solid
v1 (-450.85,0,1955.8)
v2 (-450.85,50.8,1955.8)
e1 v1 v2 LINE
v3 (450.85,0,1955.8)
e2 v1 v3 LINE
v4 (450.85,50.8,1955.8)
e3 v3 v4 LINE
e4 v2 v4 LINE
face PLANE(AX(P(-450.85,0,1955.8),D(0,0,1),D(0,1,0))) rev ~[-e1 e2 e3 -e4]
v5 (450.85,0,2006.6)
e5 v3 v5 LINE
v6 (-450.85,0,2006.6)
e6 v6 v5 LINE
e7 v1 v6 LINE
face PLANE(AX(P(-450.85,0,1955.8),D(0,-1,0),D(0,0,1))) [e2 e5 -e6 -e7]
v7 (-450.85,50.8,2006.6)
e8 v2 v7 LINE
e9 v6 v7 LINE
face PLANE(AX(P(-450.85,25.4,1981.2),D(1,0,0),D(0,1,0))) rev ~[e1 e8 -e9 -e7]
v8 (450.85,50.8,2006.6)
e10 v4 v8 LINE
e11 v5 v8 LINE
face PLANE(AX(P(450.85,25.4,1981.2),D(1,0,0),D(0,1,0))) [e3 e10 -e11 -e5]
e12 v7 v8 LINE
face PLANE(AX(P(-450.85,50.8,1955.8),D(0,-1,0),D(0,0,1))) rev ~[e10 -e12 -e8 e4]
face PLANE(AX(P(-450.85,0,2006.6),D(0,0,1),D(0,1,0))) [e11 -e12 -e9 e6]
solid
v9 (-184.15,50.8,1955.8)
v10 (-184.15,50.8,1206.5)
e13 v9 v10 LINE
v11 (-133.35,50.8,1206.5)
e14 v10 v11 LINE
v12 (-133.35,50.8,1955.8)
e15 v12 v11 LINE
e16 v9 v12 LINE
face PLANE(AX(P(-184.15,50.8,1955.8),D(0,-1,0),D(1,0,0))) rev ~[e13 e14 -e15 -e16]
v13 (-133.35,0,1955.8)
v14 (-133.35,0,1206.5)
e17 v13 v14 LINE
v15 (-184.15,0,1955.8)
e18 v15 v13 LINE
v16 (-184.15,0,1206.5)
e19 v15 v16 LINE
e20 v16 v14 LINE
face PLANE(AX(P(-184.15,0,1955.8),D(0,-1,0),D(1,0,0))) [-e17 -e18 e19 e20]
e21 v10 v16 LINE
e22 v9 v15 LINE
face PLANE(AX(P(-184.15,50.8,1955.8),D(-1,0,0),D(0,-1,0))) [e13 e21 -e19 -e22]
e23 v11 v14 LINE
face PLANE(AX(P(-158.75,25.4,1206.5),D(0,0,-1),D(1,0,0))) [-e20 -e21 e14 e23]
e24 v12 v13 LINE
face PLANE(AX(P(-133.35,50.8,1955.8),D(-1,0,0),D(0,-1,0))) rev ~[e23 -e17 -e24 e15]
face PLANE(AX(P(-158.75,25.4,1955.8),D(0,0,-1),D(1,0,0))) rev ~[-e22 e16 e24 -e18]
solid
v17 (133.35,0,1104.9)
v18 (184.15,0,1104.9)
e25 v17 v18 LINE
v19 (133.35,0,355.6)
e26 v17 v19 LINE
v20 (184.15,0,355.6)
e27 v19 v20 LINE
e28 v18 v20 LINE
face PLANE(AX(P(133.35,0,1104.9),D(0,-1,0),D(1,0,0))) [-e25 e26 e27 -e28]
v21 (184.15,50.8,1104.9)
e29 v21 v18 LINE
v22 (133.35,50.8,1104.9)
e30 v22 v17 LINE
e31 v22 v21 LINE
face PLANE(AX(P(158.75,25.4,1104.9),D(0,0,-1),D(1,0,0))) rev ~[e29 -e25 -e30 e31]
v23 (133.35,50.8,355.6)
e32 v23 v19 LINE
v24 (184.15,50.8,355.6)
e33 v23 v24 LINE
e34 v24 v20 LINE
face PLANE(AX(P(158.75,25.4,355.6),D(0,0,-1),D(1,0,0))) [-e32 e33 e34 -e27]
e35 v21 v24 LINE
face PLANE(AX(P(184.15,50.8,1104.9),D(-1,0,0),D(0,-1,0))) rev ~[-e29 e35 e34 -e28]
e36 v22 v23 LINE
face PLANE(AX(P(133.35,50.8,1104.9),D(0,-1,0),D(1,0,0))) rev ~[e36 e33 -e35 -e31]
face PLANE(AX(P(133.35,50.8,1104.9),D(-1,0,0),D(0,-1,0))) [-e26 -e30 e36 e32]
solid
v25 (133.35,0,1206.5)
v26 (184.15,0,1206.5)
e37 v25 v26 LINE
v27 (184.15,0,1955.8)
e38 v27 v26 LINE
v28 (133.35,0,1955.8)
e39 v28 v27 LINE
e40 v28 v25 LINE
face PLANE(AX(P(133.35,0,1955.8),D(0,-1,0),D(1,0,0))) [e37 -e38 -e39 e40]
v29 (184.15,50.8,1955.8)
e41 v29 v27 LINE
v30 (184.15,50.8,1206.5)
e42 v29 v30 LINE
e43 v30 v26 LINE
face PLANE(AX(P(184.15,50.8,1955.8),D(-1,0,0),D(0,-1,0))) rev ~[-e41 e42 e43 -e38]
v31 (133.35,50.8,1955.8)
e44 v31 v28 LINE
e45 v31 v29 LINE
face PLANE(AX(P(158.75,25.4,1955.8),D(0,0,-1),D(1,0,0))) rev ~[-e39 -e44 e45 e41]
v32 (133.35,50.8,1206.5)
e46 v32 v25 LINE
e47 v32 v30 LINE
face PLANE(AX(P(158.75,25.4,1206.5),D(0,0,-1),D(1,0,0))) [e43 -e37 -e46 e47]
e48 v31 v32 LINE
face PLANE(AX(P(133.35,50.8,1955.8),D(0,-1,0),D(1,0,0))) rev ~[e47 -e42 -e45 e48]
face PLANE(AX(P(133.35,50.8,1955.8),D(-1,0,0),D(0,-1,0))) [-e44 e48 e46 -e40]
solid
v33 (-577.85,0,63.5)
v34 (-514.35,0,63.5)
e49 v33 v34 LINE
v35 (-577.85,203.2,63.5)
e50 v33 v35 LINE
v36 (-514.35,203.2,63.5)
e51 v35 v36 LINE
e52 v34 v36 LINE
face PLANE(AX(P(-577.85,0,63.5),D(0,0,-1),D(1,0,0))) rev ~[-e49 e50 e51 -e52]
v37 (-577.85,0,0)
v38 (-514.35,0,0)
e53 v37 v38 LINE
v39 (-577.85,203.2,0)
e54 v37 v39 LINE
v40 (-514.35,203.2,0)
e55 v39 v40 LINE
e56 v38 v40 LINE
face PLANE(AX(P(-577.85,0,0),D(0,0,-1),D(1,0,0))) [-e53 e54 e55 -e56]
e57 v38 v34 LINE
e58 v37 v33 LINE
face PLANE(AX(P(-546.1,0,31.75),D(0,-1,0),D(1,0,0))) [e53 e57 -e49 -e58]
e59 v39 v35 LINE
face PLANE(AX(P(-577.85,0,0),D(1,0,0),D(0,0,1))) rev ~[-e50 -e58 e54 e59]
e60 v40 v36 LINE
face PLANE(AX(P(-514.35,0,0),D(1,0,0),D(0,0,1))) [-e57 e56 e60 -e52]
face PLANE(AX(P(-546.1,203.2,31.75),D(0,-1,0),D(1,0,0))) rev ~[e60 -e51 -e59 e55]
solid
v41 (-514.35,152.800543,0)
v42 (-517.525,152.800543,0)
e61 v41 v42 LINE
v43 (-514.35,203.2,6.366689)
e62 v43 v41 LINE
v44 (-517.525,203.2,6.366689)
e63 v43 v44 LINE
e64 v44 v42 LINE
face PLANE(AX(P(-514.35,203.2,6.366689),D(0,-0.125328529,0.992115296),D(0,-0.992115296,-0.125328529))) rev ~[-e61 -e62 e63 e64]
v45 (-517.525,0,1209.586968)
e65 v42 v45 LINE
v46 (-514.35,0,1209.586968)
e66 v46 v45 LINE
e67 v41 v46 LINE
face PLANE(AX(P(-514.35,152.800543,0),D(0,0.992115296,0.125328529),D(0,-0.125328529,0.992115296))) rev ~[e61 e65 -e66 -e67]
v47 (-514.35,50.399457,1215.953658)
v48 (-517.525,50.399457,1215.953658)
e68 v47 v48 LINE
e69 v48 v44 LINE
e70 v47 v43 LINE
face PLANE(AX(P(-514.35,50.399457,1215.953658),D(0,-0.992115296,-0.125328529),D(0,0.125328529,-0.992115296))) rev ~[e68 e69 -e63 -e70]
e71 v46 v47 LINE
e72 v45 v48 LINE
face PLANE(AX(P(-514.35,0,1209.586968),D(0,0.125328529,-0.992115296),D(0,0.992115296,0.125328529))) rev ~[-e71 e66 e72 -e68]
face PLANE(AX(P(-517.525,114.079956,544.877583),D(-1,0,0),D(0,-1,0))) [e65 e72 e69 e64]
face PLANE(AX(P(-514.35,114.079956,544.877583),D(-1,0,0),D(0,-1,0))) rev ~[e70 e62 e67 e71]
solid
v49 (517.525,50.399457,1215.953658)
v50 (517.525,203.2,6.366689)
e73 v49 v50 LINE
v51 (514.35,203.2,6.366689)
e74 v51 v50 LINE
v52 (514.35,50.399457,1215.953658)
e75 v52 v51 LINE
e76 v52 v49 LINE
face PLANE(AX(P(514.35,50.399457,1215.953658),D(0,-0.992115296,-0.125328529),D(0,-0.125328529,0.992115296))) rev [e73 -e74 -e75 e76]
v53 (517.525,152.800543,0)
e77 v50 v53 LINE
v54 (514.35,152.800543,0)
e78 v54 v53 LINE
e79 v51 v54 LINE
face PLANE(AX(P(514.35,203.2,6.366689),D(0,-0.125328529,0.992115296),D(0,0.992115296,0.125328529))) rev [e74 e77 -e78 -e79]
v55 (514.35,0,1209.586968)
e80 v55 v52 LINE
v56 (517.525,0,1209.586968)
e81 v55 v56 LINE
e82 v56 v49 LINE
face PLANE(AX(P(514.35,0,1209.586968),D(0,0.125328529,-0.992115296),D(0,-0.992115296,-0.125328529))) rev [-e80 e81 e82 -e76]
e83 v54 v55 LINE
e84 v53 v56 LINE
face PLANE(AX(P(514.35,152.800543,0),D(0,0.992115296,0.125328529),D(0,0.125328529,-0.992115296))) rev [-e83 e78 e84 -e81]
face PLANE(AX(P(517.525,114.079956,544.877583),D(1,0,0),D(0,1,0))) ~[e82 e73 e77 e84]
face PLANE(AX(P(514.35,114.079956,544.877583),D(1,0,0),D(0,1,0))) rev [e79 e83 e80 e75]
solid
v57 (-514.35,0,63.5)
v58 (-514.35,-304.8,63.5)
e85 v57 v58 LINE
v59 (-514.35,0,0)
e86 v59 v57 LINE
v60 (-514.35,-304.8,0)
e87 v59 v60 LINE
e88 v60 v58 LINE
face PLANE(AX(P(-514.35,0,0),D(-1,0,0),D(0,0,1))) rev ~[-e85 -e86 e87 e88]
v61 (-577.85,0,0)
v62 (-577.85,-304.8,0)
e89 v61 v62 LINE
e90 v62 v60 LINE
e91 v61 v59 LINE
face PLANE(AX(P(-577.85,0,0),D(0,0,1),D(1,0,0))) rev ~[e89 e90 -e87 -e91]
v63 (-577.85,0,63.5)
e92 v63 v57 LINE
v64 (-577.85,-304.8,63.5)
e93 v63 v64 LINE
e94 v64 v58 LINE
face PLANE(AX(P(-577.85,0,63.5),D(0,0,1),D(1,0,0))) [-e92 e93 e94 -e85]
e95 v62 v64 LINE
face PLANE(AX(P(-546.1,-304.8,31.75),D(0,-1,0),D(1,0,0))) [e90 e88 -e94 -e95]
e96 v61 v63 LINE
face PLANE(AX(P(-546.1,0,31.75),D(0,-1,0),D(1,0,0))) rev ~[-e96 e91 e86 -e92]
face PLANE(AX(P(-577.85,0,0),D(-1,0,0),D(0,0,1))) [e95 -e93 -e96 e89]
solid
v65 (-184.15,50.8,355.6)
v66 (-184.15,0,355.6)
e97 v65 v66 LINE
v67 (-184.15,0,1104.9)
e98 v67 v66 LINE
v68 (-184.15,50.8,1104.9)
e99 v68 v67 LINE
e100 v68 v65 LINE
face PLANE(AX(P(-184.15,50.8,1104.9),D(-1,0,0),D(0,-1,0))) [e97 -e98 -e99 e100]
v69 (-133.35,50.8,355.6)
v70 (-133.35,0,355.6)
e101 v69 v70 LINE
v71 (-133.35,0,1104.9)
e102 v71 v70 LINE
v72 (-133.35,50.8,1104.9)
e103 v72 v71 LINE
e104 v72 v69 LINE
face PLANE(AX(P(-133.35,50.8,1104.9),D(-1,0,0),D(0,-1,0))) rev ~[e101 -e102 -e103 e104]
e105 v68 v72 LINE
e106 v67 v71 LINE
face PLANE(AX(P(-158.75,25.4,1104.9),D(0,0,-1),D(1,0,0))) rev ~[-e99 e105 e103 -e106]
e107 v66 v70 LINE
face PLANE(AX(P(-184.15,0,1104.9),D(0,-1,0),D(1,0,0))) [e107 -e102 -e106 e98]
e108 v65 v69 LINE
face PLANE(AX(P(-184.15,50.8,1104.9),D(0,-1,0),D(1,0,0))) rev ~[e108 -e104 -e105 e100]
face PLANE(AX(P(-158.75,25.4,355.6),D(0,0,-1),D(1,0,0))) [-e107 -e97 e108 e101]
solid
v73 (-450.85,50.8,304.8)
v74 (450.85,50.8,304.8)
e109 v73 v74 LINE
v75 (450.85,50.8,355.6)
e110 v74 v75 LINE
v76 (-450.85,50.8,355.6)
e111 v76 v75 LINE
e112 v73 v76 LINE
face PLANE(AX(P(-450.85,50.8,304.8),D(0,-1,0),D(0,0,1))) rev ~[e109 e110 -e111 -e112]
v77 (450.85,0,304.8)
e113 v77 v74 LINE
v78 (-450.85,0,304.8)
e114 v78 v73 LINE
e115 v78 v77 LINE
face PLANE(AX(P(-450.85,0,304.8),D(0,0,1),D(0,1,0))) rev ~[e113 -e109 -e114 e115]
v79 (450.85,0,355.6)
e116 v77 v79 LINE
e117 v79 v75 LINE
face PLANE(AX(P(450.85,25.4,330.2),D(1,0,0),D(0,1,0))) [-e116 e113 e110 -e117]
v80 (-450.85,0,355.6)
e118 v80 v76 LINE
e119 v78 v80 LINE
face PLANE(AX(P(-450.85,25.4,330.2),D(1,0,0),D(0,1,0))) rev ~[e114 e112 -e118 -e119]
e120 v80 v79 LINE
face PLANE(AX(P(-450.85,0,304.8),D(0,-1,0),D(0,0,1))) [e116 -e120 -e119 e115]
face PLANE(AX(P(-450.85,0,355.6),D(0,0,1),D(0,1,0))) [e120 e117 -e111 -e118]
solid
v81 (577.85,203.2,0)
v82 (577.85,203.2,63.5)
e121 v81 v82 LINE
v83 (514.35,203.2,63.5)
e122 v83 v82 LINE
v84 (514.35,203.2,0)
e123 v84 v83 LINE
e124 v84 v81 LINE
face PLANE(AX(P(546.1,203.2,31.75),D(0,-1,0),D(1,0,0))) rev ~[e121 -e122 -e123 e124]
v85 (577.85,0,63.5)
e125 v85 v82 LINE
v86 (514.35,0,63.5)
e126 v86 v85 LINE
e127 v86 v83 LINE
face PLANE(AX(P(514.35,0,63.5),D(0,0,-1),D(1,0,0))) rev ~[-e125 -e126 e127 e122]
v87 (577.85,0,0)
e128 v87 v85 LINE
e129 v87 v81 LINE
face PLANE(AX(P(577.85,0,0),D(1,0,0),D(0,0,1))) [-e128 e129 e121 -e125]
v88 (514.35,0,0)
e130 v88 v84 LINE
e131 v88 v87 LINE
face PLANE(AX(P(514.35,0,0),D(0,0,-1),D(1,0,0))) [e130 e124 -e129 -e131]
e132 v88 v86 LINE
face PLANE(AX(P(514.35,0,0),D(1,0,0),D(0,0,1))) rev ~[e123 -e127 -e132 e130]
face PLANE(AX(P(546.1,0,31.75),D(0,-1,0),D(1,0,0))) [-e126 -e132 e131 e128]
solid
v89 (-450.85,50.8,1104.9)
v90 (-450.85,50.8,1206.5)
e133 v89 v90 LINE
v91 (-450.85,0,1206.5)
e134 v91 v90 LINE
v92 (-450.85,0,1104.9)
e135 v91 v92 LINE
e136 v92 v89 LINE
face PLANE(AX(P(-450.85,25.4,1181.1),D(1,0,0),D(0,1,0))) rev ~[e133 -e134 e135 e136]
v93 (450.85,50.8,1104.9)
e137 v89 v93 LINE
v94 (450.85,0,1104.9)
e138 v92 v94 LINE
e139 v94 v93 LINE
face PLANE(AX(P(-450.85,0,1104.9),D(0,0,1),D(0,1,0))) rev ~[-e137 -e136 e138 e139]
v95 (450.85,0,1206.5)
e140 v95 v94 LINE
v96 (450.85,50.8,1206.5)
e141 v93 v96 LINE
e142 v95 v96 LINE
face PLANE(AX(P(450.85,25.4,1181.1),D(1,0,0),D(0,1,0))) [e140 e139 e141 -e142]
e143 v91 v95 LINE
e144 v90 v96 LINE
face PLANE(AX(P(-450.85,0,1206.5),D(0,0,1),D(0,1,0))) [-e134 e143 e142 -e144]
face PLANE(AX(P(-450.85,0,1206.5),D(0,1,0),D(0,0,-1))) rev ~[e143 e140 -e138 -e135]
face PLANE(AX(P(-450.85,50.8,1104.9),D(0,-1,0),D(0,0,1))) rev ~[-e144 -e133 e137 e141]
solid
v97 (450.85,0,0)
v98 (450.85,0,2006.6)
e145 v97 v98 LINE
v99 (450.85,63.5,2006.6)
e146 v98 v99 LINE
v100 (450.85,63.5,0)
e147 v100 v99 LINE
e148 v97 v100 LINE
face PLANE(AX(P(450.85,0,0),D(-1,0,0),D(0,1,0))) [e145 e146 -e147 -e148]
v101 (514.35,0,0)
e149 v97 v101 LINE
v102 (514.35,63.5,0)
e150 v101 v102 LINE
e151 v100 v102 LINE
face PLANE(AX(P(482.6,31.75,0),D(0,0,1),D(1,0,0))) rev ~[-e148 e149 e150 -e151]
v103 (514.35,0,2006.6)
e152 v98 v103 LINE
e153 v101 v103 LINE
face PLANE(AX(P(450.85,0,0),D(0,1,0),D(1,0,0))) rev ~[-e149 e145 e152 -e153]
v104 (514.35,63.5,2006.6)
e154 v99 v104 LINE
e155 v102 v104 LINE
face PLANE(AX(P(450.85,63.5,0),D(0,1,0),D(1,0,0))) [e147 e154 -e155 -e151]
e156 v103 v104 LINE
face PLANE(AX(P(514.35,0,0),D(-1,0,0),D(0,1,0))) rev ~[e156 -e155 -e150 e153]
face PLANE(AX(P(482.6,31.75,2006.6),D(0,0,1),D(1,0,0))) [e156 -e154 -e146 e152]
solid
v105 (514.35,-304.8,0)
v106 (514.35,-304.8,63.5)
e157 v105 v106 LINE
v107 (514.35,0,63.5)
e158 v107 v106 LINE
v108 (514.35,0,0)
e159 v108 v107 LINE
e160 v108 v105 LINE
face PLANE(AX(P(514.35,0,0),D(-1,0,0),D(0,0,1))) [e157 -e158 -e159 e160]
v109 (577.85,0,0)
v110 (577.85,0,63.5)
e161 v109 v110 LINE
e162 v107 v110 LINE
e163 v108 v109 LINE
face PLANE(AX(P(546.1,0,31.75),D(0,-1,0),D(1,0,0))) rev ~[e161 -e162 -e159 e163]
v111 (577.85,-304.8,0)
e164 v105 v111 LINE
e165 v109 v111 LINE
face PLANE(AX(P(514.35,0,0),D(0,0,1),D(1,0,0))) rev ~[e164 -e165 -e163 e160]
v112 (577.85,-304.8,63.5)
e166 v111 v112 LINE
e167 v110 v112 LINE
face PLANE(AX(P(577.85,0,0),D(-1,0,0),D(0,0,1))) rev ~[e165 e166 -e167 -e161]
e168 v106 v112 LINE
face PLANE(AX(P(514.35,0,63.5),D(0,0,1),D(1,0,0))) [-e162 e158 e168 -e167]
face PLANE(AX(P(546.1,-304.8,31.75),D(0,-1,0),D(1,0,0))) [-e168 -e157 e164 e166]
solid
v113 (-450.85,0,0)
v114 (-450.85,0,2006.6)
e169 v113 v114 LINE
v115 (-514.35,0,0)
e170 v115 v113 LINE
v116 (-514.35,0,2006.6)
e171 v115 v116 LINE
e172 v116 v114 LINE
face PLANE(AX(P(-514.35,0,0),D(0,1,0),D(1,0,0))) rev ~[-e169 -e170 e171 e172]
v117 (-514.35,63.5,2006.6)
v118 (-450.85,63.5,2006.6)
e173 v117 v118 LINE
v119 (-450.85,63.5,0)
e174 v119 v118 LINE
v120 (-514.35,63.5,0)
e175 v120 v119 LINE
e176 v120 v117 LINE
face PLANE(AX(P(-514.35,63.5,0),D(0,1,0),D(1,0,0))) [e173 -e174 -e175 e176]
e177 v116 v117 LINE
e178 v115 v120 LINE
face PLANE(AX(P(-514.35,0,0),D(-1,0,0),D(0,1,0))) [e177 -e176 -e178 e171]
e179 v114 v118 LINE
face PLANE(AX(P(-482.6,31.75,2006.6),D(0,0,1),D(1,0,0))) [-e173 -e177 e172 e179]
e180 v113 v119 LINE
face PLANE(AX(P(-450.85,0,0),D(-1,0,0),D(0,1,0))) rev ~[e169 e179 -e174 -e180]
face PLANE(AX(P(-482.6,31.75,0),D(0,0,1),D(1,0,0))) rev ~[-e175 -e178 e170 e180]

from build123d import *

# Parameters (mm, degrees)
F0_W      = 63.5
F0_H      = 63.5
F1_DEPTH  = 2006.6
F2_W      = 63.5
F2_H      = 63.5
F3_DEPTH  = 304.8
F4_DEPTH  = 203.2
F5_W      = 50.8
F5_H      = 50.8
F6_DEPTH  = 901.7
F7_W      = 50.8
F7_H      = 50.8
F8_DEPTH  = 749.3
F9_W      = 50.8
F9_H      = 50.8
F10_DEPTH = 749.3
F12_DEPTH = 3.175


# Not quite as in the source:
# - a length typed as a fraction of an inch, garbled in the dataset ("3 / 203.2 mm" for 3/8 in), is restored


with BuildPart() as f1:
    # F0 (on Top) → F1 (new body)
    with BuildSketch(Plane.XY):
        with Locations((-482.6, 31.75)):
            Rectangle(F0_W, F0_H)
    extrude(amount=F1_DEPTH)


with BuildPart() as f1b:
    # F0 (on Top) → F1, piece 2 (new body)
    with BuildSketch(Plane.XY):
        with Locations((482.6, 31.75)):
            Rectangle(F0_W, F0_H)
    extrude(amount=F1_DEPTH)


with BuildPart() as f3:
    # F2 (on Front) → F3 (new body)
    with BuildSketch(Plane.XZ):
        with Locations((-546.1, 31.75)):
            Rectangle(F2_W, F2_H)
    extrude(amount=F3_DEPTH)


with BuildPart() as f3b:
    # F2 (on Front) → F3, piece 2 (new body)
    with BuildSketch(Plane.XZ):
        with Locations((546.1, 31.75)):
            Rectangle(F2_W, F2_H)
    extrude(amount=F3_DEPTH)


with BuildPart() as f4:
    # F4 (new): a face of the model
    f4_faces = [f3.part.faces().sort_by_distance(p)[0] for p in [
        (-546.1, 0, 31.75),
    ]]
    extrude(f4_faces, amount=F4_DEPTH)


with BuildPart() as f4b:
    # F4#2 (new): a face of the model
    f4_2_faces = [f3b.part.faces().sort_by_distance(p)[0] for p in [
        (546.1, 0, 31.75),
    ]]
    extrude(f4_2_faces, amount=F4_DEPTH)


with BuildPart() as f6:
    # F5 (on face) → F6 (new body, through all)
    with BuildSketch(Plane.YZ.offset(-450.85)):
        with Locations((25.4, 1981.2)):
            Rectangle(F5_W, F5_H)
    extrude(amount=F6_DEPTH)


with BuildPart() as f6b:
    # F5 (on face) → F6, piece 2 (new body, through all)
    with BuildSketch(Plane.YZ.offset(-450.85)):
        with Locations((25.4, 1181.1)):
            Rectangle(F5_W, F5_H)
        with Locations((25.4, 1130.3)):
            Rectangle(F5_W, F5_H)
    extrude(amount=F6_DEPTH)


with BuildPart() as f6c:
    # F5 (on face) → F6, piece 3 (new body, through all)
    with BuildSketch(Plane.YZ.offset(-450.85)):
        with Locations((25.4, 330.2)):
            Rectangle(F5_W, F5_H)
    extrude(amount=F6_DEPTH)


with BuildPart() as f8:
    # F7 (on face) → F8 (new body, through all)
    with BuildSketch(Plane(origin=(0, 0, 1955.8), x_dir=(1, 0, 0), z_dir=(0, 0, -1))):
        with Locations((-158.75, -25.4)):
            Rectangle(F7_W, F7_H)
    extrude(amount=F8_DEPTH)


with BuildPart() as f8b:
    # F7 (on face) → F8, piece 2 (new body, through all)
    with BuildSketch(Plane(origin=(0, 0, 1955.8), x_dir=(1, 0, 0), z_dir=(0, 0, -1))):
        with Locations((158.75, -25.4)):
            Rectangle(F7_W, F7_H)
    extrude(amount=F8_DEPTH)


with BuildPart() as f10:
    # F9 (on face) → F10 (new body, through all)
    with BuildSketch(Plane(origin=(0, 0, 1104.9), x_dir=(1, 0, 0), z_dir=(0, 0, -1))):
        with Locations((158.75, -25.4)):
            Rectangle(F9_W, F9_H)
    extrude(amount=F10_DEPTH)


with BuildPart() as f10b:
    # F9 (on face) → F10, piece 2 (new body, through all)
    with BuildSketch(Plane(origin=(0, 0, 1104.9), x_dir=(1, 0, 0), z_dir=(0, 0, -1))):
        with Locations((-158.75, -25.4)):
            Rectangle(F9_W, F9_H)
    extrude(amount=F10_DEPTH)


with BuildPart() as f12:
    # F11 (on face) → F12 (new body)
    with BuildSketch(Plane(origin=(-514.35, 0, 0), x_dir=(0, -1, 0), z_dir=(-1, 0, 0))):
        Polygon((-63.5, 706.913542014), (-63.5, 1112.2482272862), (-203.2, 6.366689291), (-152.8005429844, 0), align=None)
        Polygon((0, 1209.5869683754), (-50.3994570156, 1215.9536576665), (-63.5, 1112.2482272862), (-63.5, 706.913542014), align=None)
    extrude(amount=F12_DEPTH)


with BuildPart() as f13_1:
    # F13: instance of F12
    add(f12.part.mirror(Plane.YZ))


solid = Compound([f1.part, f1b.part, f3.part, f3b.part, f4.part, f4b.part, f6.part, f6b.part, f6c.part, f8.part, f8b.part, f10.part, f10b.part, f12.part, f13_1.part])
